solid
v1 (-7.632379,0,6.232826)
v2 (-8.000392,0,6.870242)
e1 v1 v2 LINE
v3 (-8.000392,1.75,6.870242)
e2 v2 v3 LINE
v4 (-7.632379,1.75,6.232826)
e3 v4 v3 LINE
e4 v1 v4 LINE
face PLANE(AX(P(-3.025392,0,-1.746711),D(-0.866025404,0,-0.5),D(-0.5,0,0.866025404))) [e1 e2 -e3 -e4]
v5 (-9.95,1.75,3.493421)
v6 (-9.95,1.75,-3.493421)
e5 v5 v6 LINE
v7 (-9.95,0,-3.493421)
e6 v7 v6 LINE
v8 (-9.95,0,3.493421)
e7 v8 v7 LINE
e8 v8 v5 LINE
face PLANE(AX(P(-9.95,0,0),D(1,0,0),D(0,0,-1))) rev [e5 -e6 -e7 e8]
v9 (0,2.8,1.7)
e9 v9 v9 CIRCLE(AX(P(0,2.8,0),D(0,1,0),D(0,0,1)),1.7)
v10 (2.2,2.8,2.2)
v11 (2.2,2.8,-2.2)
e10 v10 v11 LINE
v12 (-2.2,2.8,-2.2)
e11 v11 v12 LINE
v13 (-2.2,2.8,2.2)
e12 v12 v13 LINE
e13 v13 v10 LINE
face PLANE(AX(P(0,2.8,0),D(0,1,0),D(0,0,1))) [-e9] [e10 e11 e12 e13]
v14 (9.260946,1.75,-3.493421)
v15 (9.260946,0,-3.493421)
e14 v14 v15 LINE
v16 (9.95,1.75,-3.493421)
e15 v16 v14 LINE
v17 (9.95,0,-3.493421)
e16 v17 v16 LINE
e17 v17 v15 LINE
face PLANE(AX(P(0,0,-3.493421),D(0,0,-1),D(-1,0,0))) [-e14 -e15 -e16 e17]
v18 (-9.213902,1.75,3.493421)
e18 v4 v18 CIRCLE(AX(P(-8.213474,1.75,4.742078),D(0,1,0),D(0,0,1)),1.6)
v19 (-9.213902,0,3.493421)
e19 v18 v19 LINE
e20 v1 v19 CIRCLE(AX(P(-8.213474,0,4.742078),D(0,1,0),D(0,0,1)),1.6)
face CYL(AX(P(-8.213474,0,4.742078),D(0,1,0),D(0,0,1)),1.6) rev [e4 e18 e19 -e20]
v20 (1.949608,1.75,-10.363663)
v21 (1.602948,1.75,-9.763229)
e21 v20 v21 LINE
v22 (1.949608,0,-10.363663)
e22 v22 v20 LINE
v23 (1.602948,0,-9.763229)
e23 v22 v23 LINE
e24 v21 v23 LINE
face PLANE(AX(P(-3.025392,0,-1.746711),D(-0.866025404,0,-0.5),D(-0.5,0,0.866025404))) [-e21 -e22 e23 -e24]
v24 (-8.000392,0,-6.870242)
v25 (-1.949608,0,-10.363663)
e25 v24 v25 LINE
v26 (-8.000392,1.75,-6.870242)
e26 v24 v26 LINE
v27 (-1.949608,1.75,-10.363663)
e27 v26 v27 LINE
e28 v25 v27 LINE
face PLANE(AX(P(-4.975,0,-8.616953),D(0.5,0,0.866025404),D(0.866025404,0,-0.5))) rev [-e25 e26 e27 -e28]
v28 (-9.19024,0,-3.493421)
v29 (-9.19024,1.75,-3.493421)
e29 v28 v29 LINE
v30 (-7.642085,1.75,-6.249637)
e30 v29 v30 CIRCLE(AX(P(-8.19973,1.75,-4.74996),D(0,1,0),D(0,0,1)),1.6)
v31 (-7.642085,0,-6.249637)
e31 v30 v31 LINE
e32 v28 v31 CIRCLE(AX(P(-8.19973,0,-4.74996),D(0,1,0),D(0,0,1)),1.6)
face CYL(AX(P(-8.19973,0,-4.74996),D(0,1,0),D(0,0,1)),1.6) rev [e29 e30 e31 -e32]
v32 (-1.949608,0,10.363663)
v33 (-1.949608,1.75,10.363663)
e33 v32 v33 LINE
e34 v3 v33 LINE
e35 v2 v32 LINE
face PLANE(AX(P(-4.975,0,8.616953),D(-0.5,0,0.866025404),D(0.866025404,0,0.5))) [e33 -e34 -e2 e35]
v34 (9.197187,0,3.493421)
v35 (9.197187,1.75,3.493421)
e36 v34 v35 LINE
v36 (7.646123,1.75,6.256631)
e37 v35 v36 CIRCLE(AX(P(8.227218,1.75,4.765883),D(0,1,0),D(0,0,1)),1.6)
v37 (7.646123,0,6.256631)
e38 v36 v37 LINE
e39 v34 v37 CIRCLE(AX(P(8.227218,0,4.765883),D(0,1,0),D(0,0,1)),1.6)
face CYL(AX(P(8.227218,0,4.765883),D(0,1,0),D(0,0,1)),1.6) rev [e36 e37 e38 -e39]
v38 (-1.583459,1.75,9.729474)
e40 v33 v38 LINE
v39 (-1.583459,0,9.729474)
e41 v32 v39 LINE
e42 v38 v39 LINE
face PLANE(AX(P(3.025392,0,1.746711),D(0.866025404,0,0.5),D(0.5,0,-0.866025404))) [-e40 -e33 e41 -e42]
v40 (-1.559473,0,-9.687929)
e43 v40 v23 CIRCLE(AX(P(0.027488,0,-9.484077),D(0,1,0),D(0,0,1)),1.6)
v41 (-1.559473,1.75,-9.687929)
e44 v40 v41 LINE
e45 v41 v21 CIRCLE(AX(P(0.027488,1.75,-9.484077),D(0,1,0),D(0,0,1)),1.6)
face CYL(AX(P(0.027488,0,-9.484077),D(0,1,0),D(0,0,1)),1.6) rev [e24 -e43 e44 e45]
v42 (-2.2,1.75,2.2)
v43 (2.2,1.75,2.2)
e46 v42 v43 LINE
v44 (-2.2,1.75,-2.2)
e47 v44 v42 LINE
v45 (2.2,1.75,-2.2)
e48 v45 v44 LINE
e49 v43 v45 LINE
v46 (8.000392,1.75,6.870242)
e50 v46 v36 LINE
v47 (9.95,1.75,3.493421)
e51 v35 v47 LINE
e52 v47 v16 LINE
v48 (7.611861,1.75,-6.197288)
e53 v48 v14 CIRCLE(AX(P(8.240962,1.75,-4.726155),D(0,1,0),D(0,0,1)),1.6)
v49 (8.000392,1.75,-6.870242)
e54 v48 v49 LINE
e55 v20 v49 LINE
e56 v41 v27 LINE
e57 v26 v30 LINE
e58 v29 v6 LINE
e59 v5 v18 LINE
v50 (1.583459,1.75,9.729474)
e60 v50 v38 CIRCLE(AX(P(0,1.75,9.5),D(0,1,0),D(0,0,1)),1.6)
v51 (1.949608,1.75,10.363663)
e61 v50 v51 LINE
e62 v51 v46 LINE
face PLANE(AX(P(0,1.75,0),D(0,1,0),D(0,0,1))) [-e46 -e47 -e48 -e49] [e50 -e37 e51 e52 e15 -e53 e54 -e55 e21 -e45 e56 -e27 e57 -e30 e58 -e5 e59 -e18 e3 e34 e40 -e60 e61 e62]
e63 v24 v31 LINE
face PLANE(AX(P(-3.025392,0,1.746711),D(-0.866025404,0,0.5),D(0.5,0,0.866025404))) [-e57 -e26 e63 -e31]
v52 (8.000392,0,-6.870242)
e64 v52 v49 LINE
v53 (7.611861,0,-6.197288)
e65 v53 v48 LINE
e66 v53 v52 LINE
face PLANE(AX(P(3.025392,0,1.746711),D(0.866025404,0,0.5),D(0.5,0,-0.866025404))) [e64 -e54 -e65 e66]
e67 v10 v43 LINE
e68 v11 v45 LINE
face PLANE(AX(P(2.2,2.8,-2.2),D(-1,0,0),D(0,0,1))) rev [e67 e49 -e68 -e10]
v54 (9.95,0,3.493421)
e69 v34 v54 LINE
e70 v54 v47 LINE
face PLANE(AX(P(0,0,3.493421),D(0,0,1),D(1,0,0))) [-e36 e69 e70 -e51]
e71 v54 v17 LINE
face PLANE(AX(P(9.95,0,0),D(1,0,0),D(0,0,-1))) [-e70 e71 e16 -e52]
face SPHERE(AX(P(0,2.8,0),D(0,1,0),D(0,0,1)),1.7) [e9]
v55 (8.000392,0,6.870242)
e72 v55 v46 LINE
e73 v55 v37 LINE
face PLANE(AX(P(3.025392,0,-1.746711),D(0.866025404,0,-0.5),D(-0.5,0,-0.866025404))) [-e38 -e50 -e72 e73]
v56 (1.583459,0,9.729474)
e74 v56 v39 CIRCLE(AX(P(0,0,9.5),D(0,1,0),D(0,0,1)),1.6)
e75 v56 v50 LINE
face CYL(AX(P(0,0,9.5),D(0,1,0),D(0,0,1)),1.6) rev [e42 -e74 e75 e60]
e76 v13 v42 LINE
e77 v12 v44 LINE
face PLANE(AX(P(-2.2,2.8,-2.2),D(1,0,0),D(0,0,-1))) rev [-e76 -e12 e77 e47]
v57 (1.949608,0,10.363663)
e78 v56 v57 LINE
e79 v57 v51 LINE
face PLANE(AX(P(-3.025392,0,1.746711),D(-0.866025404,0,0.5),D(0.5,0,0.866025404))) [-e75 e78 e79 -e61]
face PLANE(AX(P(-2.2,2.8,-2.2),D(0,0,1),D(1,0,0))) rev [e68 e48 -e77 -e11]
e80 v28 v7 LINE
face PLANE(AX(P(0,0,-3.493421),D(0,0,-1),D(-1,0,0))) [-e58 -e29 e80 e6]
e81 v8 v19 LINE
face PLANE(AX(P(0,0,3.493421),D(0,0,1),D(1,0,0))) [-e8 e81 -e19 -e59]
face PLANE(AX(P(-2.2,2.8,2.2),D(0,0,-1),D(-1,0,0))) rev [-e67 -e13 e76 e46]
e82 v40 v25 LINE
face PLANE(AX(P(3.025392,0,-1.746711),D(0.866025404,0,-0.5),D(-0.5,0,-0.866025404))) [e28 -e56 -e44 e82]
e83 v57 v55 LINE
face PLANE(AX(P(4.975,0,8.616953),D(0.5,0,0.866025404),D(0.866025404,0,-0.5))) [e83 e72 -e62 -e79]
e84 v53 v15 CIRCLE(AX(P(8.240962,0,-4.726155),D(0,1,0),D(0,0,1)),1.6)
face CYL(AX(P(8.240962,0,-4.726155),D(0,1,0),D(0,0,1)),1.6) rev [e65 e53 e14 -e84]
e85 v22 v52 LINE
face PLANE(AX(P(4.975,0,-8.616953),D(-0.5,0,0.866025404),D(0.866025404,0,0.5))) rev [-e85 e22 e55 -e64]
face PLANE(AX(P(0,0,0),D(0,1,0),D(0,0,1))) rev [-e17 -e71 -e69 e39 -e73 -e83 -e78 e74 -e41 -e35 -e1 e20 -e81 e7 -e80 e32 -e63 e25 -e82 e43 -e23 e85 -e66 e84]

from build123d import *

# Parameters (mm, degrees)
SKETCH1_R           = 9.5
BOSS_EXTRUDE1_DEPTH = 1.75
BOSS_EXTRUDE4_START = -1.75
BOSS_EXTRUDE4_DEPTH = 1.75
SKETCH2_R           = 1.6
CUT_EXTRUDE1_DEPTH  = 1.75
SKETCH3_W           = 4.4
SKETCH3_H           = 4.4
BOSS_EXTRUDE2_DEPTH = 1.05
SKETCH4_R           = 1.7
BOSS_EXTRUDE3_DEPTH = 1.7
FILLET1_R           = 1.7


with BuildPart() as part:
    # Sketch1 → Boss-Extrude1 (new body)
    with BuildSketch(Plane(origin=(0, 0, 0), x_dir=(1, 0, 0), z_dir=(0, 1, 0))):
        with Locations(Location((0, 0, 0), (0, 0, 270))):
            Circle(SKETCH1_R)
    extrude(amount=BOSS_EXTRUDE1_DEPTH)

    # Sketch5 → Boss-Extrude4 (add)
    with BuildSketch(Plane(origin=(0, 1.75, 0), x_dir=(1, 0, 0), z_dir=(0, 1, 0)).offset(BOSS_EXTRUDE4_START)):
        with BuildLine():
            Line((-1.949608457, 10.363663389), (-8.000391543, 6.870242146))
            Line((-8.000391543, 6.870242146), (-7.44257413, 5.904074045))
            ThreePointArc((-7.44257413, 5.904074045), (-4.75, 8.227241336), (-1.391791044, 9.397495288))
            Line((-1.391791044, 9.397495288), (-1.949608457, 10.363663389))
        make_face()
        with BuildLine():
            ThreePointArc((-8.834365173, -3.493421243), (-9.5, 0), (-8.834365173, 3.493421243))
            Line((-8.834365173, 3.493421243), (-9.95, 3.493421243))
            Line((-9.95, 3.493421243), (-9.95, -3.493421243))
            Line((-9.95, -3.493421243), (-8.834365173, -3.493421243))
        make_face()
        with BuildLine():
            Line((1.949608457, 10.363663389), (1.391791044, 9.397495288))
            ThreePointArc((1.391791044, 9.397495288), (4.75, 8.227241336), (7.44257413, 5.904074045))
            Line((7.44257413, 5.904074045), (8.000391543, 6.870242146))
            Line((8.000391543, 6.870242146), (1.949608457, 10.363663389))
        make_face()
        with BuildLine():
            ThreePointArc((-1.391791044, -9.397495288), (-4.75, -8.227241336), (-7.44257413, -5.904074045))
            Line((-7.44257413, -5.904074045), (-8.000391543, -6.870242146))
            Line((-8.000391543, -6.870242146), (-1.949608457, -10.363663389))
            Line((-1.949608457, -10.363663389), (-1.391791044, -9.397495288))
        make_face()
        with BuildLine():
            Line((9.95, 3.493421243), (8.834365173, 3.493421243))
            ThreePointArc((8.834365173, 3.493421243), (9.5, 0), (8.834365173, -3.493421243))
            Line((8.834365173, -3.493421243), (9.95, -3.493421243))
            Line((9.95, -3.493421243), (9.95, 3.493421243))
        make_face()
        with BuildLine():
            ThreePointArc((7.44257413, -5.904074045), (4.75, -8.227241336), (1.391791044, -9.397495288))
            Line((1.391791044, -9.397495288), (1.949608457, -10.363663389))
            Line((1.949608457, -10.363663389), (8.000391543, -6.870242146))
            Line((8.000391543, -6.870242146), (7.44257413, -5.904074045))
        make_face()
    extrude(amount=BOSS_EXTRUDE4_DEPTH)

    # Sketch2 → Cut-Extrude1 (cut)
    with BuildSketch(Plane(origin=(0, 1.75, 0), x_dir=(1, 0, 0), z_dir=(0, 1, 0))):
        with Locations((0, -9.5)):
            Circle(SKETCH2_R)
        with Locations((-8.213474399, -4.742078212)):
            Circle(SKETCH2_R)
        with Locations((-8.199730461, 4.749960166)):
            Circle(SKETCH2_R)
        with Locations((0.027487877, 9.484076755)):
            Circle(SKETCH2_R)
        with Locations((8.240962276, 4.726154966)):
            Circle(SKETCH2_R)
        with Locations((8.227218338, -4.765883411)):
            Circle(SKETCH2_R)
    extrude(amount=-CUT_EXTRUDE1_DEPTH, mode=Mode.SUBTRACT)

    # Sketch3 → Boss-Extrude2 (add)
    with BuildSketch(Plane(origin=(0, 1.75, 0), x_dir=(1, 0, 0), z_dir=(0, 1, 0))):
        Rectangle(SKETCH3_W, SKETCH3_H)
    extrude(amount=BOSS_EXTRUDE2_DEPTH)

    # Sketch4 → Boss-Extrude3 (add)
    with BuildSketch(Plane(origin=(0, 2.8, 0), x_dir=(1, 0, 0), z_dir=(0, 1, 0))):
        with Locations(Location((0, 0, 0), (0, 0, 270))):
            Circle(SKETCH4_R)
    extrude(amount=BOSS_EXTRUDE3_DEPTH)

    # Fillet1
    fillet1_edges = [part.edges().sort_by_distance(p)[0] for p in [
        (0, 4.5, -1.7),
    ]]
    fillet(fillet1_edges, radius=FILLET1_R - 0.0001)  # a hair under: the kernel refuses the full size


solid = part.part
